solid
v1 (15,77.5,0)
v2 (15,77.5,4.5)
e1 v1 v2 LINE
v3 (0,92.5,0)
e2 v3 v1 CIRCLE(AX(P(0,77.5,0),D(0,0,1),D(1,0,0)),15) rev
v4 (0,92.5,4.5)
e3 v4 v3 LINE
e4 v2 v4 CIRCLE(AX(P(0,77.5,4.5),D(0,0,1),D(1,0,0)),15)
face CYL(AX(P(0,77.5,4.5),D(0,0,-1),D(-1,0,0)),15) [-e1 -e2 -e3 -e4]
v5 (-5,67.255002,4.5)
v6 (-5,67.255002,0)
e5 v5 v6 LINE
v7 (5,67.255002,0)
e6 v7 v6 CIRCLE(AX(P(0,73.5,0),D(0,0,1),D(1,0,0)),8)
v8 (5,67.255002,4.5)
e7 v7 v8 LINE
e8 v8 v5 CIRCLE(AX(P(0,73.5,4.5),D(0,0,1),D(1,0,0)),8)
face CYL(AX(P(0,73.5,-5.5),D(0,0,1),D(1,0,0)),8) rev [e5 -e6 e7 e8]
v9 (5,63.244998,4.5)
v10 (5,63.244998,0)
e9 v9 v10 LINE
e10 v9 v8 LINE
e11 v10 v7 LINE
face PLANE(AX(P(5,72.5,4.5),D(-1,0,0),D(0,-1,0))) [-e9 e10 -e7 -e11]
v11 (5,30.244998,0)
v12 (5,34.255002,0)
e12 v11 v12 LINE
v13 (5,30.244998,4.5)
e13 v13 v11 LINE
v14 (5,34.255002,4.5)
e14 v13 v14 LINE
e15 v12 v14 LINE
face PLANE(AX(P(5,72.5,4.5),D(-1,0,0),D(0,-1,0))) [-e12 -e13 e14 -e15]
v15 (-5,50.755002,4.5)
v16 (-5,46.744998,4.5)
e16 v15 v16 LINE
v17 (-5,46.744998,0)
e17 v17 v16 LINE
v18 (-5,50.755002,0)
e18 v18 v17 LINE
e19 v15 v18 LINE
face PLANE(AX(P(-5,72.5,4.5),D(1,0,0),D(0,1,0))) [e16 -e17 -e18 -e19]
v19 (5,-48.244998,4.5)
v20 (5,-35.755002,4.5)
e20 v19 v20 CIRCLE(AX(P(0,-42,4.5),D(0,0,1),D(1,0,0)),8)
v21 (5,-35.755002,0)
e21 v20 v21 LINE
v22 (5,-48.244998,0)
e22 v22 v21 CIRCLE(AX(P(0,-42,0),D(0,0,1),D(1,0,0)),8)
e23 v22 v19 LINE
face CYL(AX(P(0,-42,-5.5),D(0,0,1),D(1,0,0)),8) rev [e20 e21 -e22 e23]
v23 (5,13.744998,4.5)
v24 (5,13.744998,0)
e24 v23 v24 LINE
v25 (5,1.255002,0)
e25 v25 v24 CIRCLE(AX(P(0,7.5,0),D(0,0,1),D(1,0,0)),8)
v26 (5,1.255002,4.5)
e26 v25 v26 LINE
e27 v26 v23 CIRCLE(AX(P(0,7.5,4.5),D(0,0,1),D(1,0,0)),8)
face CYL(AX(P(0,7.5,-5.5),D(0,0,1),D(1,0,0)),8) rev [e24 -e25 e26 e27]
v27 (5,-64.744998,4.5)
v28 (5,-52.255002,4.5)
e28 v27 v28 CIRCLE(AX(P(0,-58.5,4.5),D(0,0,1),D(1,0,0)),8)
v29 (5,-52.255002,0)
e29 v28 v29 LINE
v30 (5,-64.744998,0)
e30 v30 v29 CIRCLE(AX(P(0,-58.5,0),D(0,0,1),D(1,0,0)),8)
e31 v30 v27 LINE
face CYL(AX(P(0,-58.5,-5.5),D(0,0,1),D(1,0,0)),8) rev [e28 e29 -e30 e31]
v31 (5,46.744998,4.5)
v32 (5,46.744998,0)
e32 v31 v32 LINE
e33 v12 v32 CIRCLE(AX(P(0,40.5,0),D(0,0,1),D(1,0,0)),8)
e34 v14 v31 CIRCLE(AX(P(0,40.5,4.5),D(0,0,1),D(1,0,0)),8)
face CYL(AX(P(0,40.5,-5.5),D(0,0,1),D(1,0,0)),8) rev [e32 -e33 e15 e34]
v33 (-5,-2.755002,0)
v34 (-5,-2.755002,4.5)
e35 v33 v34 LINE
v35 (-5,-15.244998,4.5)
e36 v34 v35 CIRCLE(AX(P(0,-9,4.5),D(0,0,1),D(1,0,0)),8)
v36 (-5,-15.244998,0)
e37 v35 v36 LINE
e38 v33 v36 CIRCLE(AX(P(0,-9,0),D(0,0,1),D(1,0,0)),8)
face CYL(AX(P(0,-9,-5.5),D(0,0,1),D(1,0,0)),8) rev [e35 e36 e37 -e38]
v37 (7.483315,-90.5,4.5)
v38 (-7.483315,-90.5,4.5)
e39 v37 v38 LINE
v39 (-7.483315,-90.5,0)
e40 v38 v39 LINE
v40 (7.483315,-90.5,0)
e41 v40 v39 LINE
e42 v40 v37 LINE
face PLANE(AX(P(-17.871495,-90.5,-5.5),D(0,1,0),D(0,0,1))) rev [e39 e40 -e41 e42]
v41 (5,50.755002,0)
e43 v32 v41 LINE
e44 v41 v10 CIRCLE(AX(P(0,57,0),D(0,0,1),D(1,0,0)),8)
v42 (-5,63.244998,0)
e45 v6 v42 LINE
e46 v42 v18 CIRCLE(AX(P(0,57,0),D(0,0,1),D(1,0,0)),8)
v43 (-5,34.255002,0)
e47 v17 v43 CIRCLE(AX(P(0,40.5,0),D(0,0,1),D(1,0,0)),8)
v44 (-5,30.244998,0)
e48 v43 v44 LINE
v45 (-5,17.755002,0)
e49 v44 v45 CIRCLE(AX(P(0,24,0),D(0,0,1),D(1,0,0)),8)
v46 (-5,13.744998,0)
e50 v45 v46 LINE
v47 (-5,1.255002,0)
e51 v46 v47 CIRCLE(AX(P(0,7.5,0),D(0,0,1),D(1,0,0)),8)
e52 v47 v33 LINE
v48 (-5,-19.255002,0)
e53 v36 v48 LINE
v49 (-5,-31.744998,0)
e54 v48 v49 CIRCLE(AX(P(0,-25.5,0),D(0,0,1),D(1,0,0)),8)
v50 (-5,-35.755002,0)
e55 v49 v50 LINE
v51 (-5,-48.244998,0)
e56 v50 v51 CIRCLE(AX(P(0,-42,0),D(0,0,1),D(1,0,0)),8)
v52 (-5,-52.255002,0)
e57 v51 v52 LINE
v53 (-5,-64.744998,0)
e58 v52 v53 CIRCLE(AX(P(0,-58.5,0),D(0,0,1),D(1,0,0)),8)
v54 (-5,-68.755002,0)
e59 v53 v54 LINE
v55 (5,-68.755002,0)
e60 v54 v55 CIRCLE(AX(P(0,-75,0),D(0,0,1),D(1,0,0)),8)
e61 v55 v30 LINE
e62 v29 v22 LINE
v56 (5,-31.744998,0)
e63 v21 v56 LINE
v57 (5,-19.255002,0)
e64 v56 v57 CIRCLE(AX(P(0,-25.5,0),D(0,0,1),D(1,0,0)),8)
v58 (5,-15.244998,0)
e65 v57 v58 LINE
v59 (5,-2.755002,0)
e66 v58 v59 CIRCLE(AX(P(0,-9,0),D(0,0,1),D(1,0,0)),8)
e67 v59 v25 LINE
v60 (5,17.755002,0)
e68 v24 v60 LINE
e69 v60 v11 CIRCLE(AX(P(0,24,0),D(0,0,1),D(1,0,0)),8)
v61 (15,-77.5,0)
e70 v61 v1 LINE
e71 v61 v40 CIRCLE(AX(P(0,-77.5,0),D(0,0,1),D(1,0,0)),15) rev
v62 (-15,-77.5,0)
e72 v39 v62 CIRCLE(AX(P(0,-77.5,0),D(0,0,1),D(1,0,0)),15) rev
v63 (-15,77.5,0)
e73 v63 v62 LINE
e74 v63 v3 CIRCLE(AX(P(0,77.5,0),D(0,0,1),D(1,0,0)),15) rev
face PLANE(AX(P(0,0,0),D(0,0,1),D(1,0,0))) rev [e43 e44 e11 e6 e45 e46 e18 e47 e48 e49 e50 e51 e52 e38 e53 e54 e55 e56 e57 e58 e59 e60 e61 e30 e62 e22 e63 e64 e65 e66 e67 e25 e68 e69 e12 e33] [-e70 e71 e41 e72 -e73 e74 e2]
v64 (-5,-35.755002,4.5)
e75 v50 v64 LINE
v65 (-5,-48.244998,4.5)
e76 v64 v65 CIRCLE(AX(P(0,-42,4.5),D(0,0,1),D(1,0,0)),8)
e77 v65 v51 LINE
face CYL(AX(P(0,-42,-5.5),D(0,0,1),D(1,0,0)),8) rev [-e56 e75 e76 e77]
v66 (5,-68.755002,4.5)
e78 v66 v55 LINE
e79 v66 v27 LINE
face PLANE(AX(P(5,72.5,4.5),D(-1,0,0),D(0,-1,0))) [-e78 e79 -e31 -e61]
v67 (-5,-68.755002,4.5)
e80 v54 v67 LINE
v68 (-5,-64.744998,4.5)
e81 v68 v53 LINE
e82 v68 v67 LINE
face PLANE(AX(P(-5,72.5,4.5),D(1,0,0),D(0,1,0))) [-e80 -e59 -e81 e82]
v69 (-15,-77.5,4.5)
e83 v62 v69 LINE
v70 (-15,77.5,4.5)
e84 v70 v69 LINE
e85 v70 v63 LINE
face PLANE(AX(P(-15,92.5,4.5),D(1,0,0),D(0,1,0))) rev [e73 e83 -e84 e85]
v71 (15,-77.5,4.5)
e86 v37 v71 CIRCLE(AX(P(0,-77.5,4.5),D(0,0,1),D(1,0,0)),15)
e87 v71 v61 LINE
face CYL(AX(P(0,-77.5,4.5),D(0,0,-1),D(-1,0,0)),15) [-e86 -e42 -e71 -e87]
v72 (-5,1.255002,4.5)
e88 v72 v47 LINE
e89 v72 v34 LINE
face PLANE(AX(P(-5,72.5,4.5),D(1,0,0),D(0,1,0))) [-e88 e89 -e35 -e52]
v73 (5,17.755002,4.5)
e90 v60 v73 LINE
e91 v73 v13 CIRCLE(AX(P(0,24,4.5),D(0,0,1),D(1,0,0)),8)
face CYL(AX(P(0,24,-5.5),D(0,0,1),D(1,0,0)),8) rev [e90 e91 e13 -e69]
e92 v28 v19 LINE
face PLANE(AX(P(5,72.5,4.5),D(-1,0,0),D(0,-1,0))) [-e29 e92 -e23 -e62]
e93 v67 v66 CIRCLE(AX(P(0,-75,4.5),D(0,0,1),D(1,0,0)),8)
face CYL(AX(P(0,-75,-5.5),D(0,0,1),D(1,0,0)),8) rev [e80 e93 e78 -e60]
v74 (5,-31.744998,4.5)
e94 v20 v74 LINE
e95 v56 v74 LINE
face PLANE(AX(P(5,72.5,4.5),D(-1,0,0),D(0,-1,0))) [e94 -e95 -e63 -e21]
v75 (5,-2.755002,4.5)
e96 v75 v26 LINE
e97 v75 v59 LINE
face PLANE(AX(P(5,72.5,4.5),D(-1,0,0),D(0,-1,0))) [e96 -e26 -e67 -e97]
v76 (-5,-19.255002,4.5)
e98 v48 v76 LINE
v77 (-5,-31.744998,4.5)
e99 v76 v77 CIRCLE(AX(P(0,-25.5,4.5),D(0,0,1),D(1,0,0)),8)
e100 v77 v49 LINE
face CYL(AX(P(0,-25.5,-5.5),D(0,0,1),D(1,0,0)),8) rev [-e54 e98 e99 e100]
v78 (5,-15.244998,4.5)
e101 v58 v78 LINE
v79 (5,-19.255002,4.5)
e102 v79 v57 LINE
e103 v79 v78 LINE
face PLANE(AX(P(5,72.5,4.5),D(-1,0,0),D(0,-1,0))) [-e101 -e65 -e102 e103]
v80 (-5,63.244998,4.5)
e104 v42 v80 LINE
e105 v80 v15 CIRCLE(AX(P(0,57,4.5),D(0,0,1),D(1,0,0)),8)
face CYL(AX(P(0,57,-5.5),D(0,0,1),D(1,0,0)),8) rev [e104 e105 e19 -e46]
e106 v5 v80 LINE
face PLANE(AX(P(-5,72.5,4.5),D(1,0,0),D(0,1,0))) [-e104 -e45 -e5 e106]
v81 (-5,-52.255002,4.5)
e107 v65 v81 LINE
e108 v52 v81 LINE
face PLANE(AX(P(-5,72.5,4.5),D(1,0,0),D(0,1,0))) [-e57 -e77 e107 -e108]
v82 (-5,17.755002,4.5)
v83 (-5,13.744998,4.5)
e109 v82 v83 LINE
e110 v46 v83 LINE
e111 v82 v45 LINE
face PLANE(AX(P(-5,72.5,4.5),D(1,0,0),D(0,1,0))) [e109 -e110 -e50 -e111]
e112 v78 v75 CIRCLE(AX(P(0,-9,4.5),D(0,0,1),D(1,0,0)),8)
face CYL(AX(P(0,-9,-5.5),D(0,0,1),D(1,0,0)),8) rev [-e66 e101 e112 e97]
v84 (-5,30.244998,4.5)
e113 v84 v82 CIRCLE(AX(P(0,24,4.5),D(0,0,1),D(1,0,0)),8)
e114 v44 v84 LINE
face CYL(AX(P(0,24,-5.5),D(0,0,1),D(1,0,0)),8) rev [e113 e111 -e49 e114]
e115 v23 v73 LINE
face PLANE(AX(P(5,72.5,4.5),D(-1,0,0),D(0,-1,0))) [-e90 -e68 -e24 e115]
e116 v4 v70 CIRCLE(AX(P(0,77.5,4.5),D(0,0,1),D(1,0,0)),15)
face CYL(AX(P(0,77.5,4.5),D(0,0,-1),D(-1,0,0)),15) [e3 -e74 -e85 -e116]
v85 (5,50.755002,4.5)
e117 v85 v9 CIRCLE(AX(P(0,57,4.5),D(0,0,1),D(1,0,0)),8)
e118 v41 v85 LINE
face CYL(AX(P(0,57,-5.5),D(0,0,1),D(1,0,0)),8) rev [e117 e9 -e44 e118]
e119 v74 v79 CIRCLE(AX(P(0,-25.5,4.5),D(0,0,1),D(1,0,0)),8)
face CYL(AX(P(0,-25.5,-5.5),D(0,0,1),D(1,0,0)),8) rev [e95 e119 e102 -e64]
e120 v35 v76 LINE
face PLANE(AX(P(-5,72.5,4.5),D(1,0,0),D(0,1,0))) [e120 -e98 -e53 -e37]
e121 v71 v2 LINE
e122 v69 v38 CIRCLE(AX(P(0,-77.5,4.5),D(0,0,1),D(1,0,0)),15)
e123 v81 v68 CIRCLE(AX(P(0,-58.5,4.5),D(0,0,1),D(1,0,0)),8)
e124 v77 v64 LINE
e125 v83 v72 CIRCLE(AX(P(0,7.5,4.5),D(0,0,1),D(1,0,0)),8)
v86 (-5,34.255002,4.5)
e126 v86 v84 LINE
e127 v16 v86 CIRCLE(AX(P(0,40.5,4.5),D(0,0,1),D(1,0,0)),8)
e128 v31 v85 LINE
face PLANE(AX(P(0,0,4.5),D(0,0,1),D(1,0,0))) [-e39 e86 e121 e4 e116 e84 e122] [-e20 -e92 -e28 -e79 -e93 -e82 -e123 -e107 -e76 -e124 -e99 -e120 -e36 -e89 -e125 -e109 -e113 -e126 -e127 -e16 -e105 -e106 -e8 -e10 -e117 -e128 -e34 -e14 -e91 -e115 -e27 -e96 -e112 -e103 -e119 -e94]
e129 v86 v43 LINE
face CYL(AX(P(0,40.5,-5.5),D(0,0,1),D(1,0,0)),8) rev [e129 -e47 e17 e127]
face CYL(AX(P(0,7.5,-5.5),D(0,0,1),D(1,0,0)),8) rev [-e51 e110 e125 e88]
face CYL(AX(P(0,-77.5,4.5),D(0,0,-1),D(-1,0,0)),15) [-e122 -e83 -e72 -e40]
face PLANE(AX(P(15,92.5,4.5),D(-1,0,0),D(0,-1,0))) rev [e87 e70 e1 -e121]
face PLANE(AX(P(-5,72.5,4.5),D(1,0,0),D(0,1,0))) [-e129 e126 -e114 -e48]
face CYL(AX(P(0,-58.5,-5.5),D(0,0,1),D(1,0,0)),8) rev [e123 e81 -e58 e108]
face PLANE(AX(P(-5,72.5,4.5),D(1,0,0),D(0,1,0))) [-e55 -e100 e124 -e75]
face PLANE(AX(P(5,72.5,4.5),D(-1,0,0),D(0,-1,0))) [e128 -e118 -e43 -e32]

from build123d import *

# Parameters (mm, degrees)
CROQUIS1_W              = 30
CROQUIS1_H              = 185
SALIENTE_EXTRUIR1_DEPTH = 4.5
REDONDEO1_R             = 15
CROQUIS2_R              = 8
CORTAR_EXTRUIR1_DEPTH   = 10
CROQUIS3_W              = 36.075387002
CROQUIS3_H              = 11.559576231
CORTAR_EXTRUIR2_DEPTH   = 10


with BuildPart() as part:
    # Croquis1 → Saliente-Extruir1 (new body)
    with BuildSketch(Plane.XY):
        Rectangle(CROQUIS1_W, CROQUIS1_H)
        with BuildLine():
            Line((5, 72.5), (5, -72.5))
            ThreePointArc((5, -72.5), (0, -77.5), (-5, -72.5))
            Line((-5, -72.5), (-5, 72.5))
            ThreePointArc((-5, 72.5), (0, 77.5), (5, 72.5))
        make_face(mode=Mode.SUBTRACT)
    extrude(amount=SALIENTE_EXTRUIR1_DEPTH)

    # Redondeo1
    redondeo1_edges = [part.edges().sort_by_distance(p)[0] for p in [
        (15, -92.5, 2.25),
        (-15, -92.5, 2.25),
        (-15, 92.5, 2.25),
        (15, 92.5, 2.25),
    ]]
    fillet(redondeo1_edges, radius=REDONDEO1_R - 0.0001)  # a hair under: the kernel refuses the full size

    # Croquis2 → Cortar-Extruir1 (cut)
    with BuildSketch(Plane.XY.offset(4.5)):
        with Locations((0, 73.5)):
            Circle(CROQUIS2_R)
        with Locations((0, 57)):
            Circle(CROQUIS2_R)
        with Locations((0, 40.5)):
            Circle(CROQUIS2_R)
        with Locations((0, 24)):
            Circle(CROQUIS2_R)
        with Locations((0, 7.5)):
            Circle(CROQUIS2_R)
        with Locations((0, -9)):
            Circle(CROQUIS2_R)
        with Locations((0, -25.5)):
            Circle(CROQUIS2_R)
        with Locations((0, -42)):
            Circle(CROQUIS2_R)
        with Locations((0, -58.5)):
            Circle(CROQUIS2_R)
        with Locations((0, -75)):
            Circle(CROQUIS2_R)
    extrude(amount=-CORTAR_EXTRUIR1_DEPTH, mode=Mode.SUBTRACT)

    # Croquis3 → Cortar-Extruir2 (cut)
    with BuildSketch(Plane.XY.offset(4.5)):
        with Locations((0.166198184, -96.279788115)):
            Rectangle(CROQUIS3_W, CROQUIS3_H)
    extrude(amount=-CORTAR_EXTRUIR2_DEPTH, mode=Mode.SUBTRACT)


solid = part.part
